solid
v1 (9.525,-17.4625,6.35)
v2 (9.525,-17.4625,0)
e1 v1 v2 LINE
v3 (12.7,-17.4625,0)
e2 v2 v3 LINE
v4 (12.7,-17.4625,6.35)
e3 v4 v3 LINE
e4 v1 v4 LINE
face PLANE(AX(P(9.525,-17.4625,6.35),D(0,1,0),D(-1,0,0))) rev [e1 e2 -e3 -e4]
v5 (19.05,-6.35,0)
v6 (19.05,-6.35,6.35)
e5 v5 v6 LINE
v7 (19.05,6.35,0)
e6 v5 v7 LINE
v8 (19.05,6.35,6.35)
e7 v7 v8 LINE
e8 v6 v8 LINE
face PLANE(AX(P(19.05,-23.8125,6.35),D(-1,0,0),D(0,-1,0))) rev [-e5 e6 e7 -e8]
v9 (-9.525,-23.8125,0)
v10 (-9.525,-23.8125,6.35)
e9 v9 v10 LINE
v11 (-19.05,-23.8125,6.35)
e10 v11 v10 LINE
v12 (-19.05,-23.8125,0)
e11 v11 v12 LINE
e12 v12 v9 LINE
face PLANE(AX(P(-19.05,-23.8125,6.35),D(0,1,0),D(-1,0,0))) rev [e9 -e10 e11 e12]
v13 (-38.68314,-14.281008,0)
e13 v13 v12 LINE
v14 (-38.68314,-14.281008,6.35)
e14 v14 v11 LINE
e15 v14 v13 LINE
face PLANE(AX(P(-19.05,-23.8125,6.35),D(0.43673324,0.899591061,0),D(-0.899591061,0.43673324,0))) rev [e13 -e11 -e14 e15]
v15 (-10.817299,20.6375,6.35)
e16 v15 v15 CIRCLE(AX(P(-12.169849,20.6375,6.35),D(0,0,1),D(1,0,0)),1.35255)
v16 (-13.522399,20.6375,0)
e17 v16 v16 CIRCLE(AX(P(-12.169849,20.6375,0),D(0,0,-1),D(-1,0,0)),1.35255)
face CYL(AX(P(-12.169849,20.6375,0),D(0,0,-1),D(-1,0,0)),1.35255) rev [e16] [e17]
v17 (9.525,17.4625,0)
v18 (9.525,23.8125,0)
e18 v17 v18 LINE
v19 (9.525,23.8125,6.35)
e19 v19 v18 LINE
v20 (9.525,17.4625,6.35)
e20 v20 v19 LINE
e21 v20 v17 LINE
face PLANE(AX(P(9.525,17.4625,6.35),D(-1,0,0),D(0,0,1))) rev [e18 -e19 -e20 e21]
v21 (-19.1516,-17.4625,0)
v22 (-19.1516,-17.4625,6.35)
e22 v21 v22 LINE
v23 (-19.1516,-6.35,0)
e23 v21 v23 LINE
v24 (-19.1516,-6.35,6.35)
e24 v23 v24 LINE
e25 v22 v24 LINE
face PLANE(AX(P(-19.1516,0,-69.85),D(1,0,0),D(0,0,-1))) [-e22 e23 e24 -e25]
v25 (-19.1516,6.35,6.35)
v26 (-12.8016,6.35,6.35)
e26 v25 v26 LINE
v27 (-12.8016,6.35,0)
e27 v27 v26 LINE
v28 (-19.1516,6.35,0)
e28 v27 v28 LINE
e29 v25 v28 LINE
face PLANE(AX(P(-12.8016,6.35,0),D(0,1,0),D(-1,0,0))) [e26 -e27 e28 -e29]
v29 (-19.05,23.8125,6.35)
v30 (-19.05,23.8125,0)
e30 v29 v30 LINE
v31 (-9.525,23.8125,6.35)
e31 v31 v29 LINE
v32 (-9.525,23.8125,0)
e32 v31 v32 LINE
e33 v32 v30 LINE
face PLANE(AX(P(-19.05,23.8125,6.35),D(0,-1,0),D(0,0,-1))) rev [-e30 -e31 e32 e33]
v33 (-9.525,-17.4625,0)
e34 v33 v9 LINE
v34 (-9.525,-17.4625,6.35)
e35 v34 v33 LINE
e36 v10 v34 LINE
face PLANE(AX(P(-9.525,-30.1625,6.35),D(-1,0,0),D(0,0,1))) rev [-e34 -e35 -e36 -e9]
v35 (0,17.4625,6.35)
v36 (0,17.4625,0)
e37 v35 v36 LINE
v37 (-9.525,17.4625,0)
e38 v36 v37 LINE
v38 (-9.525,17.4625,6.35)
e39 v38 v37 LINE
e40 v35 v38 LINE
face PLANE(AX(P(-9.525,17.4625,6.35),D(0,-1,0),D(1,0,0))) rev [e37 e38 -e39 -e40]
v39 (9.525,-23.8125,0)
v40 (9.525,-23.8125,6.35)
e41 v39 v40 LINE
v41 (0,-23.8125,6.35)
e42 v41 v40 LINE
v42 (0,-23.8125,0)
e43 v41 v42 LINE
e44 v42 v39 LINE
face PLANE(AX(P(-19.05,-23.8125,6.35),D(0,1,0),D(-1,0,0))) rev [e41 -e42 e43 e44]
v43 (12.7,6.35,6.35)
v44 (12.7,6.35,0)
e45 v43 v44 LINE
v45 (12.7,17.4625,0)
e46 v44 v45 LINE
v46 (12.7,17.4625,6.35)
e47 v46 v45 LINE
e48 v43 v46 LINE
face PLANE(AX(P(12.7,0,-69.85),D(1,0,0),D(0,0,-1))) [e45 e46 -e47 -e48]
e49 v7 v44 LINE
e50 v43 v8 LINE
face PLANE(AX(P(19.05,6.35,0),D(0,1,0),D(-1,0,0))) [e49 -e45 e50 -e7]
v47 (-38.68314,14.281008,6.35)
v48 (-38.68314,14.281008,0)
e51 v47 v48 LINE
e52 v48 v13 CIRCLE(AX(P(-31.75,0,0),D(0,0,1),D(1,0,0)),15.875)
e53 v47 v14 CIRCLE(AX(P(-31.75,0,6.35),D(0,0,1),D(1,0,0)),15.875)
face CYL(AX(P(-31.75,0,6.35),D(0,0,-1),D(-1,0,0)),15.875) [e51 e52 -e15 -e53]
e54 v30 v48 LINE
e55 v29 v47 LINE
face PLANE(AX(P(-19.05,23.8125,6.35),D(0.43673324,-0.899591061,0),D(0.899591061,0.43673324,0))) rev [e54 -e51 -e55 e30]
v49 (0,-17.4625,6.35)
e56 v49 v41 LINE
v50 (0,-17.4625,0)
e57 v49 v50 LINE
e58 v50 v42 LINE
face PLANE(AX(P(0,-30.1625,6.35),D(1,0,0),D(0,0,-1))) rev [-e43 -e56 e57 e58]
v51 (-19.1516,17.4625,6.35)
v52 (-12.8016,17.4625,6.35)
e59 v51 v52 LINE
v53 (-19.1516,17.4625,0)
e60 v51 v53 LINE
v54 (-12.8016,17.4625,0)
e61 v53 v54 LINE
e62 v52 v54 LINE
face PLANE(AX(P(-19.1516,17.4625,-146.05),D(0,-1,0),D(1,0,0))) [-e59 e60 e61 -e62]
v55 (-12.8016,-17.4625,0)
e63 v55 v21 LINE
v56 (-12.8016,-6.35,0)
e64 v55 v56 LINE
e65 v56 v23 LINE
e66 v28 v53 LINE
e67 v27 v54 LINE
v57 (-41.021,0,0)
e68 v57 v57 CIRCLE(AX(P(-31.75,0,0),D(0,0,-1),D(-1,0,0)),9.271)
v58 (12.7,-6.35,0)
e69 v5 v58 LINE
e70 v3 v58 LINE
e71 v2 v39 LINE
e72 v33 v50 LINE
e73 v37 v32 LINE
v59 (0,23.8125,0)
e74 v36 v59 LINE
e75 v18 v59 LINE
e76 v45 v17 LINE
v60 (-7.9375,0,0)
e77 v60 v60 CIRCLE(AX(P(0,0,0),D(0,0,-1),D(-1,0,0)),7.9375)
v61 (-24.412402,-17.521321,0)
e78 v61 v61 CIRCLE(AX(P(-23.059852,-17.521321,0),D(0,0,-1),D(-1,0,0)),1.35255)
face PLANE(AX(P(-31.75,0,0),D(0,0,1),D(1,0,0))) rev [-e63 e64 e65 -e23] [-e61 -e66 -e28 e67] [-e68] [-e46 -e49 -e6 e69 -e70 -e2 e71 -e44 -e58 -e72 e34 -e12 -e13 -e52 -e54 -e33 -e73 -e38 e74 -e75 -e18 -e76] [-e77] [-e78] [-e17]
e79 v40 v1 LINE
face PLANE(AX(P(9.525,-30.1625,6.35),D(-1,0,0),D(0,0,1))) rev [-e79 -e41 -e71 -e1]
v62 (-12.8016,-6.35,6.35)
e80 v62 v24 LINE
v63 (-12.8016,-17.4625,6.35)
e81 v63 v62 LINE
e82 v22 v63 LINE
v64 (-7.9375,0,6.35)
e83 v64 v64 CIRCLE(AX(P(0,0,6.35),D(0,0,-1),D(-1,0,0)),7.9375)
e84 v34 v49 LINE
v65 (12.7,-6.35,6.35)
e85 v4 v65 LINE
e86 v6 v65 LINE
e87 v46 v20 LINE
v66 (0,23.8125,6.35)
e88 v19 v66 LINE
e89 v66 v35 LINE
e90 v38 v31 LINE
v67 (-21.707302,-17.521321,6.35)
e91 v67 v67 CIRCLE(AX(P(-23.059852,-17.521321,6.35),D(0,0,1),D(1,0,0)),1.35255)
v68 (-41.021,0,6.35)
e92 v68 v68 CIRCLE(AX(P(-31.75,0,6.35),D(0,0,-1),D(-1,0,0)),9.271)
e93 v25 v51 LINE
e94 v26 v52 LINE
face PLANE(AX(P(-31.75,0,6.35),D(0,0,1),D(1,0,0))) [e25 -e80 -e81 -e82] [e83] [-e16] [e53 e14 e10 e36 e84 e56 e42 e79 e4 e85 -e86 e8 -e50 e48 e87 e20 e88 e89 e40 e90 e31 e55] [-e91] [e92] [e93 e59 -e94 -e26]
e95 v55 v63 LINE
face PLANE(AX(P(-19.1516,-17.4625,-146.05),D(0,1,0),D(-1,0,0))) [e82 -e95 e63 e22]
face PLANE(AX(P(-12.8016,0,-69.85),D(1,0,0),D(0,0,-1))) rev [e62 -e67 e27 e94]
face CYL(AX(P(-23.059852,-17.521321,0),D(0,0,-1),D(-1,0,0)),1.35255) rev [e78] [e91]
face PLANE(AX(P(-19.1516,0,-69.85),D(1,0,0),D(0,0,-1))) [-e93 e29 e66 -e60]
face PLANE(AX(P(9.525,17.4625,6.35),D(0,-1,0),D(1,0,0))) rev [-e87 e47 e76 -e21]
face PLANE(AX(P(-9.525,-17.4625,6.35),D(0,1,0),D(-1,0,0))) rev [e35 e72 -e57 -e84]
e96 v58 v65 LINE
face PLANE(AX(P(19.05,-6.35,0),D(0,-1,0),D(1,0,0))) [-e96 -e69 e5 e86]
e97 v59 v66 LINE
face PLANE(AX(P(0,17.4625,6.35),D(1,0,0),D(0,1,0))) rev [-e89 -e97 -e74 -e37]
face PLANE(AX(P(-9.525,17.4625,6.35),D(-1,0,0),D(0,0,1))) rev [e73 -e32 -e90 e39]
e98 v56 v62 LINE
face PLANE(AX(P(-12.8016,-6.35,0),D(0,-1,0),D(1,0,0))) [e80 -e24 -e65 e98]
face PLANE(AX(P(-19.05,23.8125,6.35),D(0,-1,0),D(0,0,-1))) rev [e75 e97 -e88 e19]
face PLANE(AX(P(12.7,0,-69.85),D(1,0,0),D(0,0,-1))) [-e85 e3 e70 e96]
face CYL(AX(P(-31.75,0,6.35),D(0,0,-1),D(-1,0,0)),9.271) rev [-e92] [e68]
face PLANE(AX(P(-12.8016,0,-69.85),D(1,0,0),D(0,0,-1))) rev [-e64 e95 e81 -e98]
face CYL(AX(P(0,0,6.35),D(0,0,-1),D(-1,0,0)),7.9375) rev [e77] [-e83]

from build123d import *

# Parameters (mm, degrees)
MASS_DEPTH                = 6.35
SKETCH4_R                 = 9.271
CUT_EXTRUDE1_DEPTH        = 54.623672769
SKETCH3_W                 = 9.525
SKETCH3_H                 = 12.7
CUT_EXTRUDE2_DEPTH        = 54.623672769
LPATTERN1_COUNT           = 2
LPATTERN1_PITCH           = 19.05
CAVITY1_START             = -19.1516
CAVITY1_OUTLINE_W         = 11.1125
CAVITY1_OUTLINE_H         = 6.35
CAVITY1_DEPTH             = 6.35
CAVITY1_START_2           = 12.7
CAVITY1_2_OUTLINE_W       = 11.1125
CAVITY1_2_OUTLINE_H       = 6.35
CAVITY1_2_DEPTH           = 6.35
SKETCH5_R                 = 7.9375
CUT_EXTRUDE3_DEPTH        = 54.623672769
F_6_32_TAPPED_HOLE1_D     = 2.7051
F_6_32_TAPPED_HOLE1_DEPTH = 152.4
F_6_32_TAPPED_HOLE1_TIP   = 0.81269403


# Read off the part's stored shape, not the designer's step: Cavity1
with BuildPart() as part:
    # Sketch1 → Mass (new body)
    with BuildSketch(Plane.XY):
        with BuildLine():
            Line((-19.05, -23.8125), (19.05, -23.8125))
            Line((19.05, -23.8125), (19.05, 23.8125))
            Line((19.05, 23.8125), (-19.05, 23.8125))
            Line((-19.05, 23.8125), (-38.68314018, 14.281008096))
            ThreePointArc((-38.68314018, 14.281008096), (-47.625, 0), (-38.68314018, -14.281008096))
            Line((-38.68314018, -14.281008096), (-19.05, -23.8125))
        make_face()
    extrude(amount=MASS_DEPTH)

    # Sketch4 → Cut-Extrude1 (cut, through all)
    with BuildSketch(Plane(origin=(0, 0, 0), x_dir=(-1, 0, 0), z_dir=(0, 0, -1))):
        with Locations((31.75, 0)):
            Circle(SKETCH4_R)
    extrude(amount=-CUT_EXTRUDE1_DEPTH, mode=Mode.SUBTRACT)

    # Sketch3 → Cut-Extrude2 (cut, through all)
    with BuildSketch(Plane(origin=(0, 0, 0), x_dir=(-1, 0, 0), z_dir=(0, 0, -1))):
        with Locations((-14.2875, 23.8125)):
            Rectangle(SKETCH3_W, SKETCH3_H)
        with Locations((-14.2875, -23.8125)):
            Rectangle(SKETCH3_W, SKETCH3_H)
    cut_extrude2 = extrude(amount=-CUT_EXTRUDE2_DEPTH, mode=Mode.SUBTRACT)

    # LPattern1: Cut-Extrude2 ×2
    with Locations(*[(-i * LPATTERN1_PITCH, 0, 0) for i in range(1, LPATTERN1_COUNT)]):
        add(cut_extrude2, mode=Mode.SUBTRACT)

    # Cavity1 outline → Cavity1 (cut)
    with BuildSketch(Plane.YZ.offset(CAVITY1_START)):
        with Locations((-11.90625, 3.175)):
            Rectangle(CAVITY1_OUTLINE_W, CAVITY1_OUTLINE_H)
        with Locations((11.90625, 3.175)):
            Rectangle(CAVITY1_OUTLINE_W, CAVITY1_OUTLINE_H)
    extrude(amount=CAVITY1_DEPTH, mode=Mode.SUBTRACT)

    # Cavity1 2 outline → Cavity1 2 (cut)
    with BuildSketch(Plane.YZ.offset(CAVITY1_START_2)):
        with Locations((-11.90625, 3.175)):
            Rectangle(CAVITY1_2_OUTLINE_W, CAVITY1_2_OUTLINE_H)
        with Locations((11.90625, 3.175)):
            Rectangle(CAVITY1_2_OUTLINE_W, CAVITY1_2_OUTLINE_H)
    extrude(amount=CAVITY1_2_DEPTH, mode=Mode.SUBTRACT)

    # Sketch5 → Cut-Extrude3 (cut, through all)
    with BuildSketch(Plane(origin=(0, 0, 0), x_dir=(-1, 0, 0), z_dir=(0, 0, -1))):
        Circle(SKETCH5_R)
    extrude(amount=-CUT_EXTRUDE3_DEPTH, mode=Mode.SUBTRACT)

    # #6-32 Tapped Hole1
    with Locations(Plane(origin=(0, 0, 0), x_dir=(-1, 0, 0), z_dir=(0, 0, -1))):
        with Locations((23.059852363, -17.521321241), (12.169849394, 20.6375)):
            Hole(F_6_32_TAPPED_HOLE1_D / 2, depth=F_6_32_TAPPED_HOLE1_DEPTH)
            with Locations((0, 0, -(F_6_32_TAPPED_HOLE1_DEPTH + F_6_32_TAPPED_HOLE1_TIP / 2))):  # 118° drill point
                Cone(0, F_6_32_TAPPED_HOLE1_D / 2, F_6_32_TAPPED_HOLE1_TIP, mode=Mode.SUBTRACT)


solid = part.part
